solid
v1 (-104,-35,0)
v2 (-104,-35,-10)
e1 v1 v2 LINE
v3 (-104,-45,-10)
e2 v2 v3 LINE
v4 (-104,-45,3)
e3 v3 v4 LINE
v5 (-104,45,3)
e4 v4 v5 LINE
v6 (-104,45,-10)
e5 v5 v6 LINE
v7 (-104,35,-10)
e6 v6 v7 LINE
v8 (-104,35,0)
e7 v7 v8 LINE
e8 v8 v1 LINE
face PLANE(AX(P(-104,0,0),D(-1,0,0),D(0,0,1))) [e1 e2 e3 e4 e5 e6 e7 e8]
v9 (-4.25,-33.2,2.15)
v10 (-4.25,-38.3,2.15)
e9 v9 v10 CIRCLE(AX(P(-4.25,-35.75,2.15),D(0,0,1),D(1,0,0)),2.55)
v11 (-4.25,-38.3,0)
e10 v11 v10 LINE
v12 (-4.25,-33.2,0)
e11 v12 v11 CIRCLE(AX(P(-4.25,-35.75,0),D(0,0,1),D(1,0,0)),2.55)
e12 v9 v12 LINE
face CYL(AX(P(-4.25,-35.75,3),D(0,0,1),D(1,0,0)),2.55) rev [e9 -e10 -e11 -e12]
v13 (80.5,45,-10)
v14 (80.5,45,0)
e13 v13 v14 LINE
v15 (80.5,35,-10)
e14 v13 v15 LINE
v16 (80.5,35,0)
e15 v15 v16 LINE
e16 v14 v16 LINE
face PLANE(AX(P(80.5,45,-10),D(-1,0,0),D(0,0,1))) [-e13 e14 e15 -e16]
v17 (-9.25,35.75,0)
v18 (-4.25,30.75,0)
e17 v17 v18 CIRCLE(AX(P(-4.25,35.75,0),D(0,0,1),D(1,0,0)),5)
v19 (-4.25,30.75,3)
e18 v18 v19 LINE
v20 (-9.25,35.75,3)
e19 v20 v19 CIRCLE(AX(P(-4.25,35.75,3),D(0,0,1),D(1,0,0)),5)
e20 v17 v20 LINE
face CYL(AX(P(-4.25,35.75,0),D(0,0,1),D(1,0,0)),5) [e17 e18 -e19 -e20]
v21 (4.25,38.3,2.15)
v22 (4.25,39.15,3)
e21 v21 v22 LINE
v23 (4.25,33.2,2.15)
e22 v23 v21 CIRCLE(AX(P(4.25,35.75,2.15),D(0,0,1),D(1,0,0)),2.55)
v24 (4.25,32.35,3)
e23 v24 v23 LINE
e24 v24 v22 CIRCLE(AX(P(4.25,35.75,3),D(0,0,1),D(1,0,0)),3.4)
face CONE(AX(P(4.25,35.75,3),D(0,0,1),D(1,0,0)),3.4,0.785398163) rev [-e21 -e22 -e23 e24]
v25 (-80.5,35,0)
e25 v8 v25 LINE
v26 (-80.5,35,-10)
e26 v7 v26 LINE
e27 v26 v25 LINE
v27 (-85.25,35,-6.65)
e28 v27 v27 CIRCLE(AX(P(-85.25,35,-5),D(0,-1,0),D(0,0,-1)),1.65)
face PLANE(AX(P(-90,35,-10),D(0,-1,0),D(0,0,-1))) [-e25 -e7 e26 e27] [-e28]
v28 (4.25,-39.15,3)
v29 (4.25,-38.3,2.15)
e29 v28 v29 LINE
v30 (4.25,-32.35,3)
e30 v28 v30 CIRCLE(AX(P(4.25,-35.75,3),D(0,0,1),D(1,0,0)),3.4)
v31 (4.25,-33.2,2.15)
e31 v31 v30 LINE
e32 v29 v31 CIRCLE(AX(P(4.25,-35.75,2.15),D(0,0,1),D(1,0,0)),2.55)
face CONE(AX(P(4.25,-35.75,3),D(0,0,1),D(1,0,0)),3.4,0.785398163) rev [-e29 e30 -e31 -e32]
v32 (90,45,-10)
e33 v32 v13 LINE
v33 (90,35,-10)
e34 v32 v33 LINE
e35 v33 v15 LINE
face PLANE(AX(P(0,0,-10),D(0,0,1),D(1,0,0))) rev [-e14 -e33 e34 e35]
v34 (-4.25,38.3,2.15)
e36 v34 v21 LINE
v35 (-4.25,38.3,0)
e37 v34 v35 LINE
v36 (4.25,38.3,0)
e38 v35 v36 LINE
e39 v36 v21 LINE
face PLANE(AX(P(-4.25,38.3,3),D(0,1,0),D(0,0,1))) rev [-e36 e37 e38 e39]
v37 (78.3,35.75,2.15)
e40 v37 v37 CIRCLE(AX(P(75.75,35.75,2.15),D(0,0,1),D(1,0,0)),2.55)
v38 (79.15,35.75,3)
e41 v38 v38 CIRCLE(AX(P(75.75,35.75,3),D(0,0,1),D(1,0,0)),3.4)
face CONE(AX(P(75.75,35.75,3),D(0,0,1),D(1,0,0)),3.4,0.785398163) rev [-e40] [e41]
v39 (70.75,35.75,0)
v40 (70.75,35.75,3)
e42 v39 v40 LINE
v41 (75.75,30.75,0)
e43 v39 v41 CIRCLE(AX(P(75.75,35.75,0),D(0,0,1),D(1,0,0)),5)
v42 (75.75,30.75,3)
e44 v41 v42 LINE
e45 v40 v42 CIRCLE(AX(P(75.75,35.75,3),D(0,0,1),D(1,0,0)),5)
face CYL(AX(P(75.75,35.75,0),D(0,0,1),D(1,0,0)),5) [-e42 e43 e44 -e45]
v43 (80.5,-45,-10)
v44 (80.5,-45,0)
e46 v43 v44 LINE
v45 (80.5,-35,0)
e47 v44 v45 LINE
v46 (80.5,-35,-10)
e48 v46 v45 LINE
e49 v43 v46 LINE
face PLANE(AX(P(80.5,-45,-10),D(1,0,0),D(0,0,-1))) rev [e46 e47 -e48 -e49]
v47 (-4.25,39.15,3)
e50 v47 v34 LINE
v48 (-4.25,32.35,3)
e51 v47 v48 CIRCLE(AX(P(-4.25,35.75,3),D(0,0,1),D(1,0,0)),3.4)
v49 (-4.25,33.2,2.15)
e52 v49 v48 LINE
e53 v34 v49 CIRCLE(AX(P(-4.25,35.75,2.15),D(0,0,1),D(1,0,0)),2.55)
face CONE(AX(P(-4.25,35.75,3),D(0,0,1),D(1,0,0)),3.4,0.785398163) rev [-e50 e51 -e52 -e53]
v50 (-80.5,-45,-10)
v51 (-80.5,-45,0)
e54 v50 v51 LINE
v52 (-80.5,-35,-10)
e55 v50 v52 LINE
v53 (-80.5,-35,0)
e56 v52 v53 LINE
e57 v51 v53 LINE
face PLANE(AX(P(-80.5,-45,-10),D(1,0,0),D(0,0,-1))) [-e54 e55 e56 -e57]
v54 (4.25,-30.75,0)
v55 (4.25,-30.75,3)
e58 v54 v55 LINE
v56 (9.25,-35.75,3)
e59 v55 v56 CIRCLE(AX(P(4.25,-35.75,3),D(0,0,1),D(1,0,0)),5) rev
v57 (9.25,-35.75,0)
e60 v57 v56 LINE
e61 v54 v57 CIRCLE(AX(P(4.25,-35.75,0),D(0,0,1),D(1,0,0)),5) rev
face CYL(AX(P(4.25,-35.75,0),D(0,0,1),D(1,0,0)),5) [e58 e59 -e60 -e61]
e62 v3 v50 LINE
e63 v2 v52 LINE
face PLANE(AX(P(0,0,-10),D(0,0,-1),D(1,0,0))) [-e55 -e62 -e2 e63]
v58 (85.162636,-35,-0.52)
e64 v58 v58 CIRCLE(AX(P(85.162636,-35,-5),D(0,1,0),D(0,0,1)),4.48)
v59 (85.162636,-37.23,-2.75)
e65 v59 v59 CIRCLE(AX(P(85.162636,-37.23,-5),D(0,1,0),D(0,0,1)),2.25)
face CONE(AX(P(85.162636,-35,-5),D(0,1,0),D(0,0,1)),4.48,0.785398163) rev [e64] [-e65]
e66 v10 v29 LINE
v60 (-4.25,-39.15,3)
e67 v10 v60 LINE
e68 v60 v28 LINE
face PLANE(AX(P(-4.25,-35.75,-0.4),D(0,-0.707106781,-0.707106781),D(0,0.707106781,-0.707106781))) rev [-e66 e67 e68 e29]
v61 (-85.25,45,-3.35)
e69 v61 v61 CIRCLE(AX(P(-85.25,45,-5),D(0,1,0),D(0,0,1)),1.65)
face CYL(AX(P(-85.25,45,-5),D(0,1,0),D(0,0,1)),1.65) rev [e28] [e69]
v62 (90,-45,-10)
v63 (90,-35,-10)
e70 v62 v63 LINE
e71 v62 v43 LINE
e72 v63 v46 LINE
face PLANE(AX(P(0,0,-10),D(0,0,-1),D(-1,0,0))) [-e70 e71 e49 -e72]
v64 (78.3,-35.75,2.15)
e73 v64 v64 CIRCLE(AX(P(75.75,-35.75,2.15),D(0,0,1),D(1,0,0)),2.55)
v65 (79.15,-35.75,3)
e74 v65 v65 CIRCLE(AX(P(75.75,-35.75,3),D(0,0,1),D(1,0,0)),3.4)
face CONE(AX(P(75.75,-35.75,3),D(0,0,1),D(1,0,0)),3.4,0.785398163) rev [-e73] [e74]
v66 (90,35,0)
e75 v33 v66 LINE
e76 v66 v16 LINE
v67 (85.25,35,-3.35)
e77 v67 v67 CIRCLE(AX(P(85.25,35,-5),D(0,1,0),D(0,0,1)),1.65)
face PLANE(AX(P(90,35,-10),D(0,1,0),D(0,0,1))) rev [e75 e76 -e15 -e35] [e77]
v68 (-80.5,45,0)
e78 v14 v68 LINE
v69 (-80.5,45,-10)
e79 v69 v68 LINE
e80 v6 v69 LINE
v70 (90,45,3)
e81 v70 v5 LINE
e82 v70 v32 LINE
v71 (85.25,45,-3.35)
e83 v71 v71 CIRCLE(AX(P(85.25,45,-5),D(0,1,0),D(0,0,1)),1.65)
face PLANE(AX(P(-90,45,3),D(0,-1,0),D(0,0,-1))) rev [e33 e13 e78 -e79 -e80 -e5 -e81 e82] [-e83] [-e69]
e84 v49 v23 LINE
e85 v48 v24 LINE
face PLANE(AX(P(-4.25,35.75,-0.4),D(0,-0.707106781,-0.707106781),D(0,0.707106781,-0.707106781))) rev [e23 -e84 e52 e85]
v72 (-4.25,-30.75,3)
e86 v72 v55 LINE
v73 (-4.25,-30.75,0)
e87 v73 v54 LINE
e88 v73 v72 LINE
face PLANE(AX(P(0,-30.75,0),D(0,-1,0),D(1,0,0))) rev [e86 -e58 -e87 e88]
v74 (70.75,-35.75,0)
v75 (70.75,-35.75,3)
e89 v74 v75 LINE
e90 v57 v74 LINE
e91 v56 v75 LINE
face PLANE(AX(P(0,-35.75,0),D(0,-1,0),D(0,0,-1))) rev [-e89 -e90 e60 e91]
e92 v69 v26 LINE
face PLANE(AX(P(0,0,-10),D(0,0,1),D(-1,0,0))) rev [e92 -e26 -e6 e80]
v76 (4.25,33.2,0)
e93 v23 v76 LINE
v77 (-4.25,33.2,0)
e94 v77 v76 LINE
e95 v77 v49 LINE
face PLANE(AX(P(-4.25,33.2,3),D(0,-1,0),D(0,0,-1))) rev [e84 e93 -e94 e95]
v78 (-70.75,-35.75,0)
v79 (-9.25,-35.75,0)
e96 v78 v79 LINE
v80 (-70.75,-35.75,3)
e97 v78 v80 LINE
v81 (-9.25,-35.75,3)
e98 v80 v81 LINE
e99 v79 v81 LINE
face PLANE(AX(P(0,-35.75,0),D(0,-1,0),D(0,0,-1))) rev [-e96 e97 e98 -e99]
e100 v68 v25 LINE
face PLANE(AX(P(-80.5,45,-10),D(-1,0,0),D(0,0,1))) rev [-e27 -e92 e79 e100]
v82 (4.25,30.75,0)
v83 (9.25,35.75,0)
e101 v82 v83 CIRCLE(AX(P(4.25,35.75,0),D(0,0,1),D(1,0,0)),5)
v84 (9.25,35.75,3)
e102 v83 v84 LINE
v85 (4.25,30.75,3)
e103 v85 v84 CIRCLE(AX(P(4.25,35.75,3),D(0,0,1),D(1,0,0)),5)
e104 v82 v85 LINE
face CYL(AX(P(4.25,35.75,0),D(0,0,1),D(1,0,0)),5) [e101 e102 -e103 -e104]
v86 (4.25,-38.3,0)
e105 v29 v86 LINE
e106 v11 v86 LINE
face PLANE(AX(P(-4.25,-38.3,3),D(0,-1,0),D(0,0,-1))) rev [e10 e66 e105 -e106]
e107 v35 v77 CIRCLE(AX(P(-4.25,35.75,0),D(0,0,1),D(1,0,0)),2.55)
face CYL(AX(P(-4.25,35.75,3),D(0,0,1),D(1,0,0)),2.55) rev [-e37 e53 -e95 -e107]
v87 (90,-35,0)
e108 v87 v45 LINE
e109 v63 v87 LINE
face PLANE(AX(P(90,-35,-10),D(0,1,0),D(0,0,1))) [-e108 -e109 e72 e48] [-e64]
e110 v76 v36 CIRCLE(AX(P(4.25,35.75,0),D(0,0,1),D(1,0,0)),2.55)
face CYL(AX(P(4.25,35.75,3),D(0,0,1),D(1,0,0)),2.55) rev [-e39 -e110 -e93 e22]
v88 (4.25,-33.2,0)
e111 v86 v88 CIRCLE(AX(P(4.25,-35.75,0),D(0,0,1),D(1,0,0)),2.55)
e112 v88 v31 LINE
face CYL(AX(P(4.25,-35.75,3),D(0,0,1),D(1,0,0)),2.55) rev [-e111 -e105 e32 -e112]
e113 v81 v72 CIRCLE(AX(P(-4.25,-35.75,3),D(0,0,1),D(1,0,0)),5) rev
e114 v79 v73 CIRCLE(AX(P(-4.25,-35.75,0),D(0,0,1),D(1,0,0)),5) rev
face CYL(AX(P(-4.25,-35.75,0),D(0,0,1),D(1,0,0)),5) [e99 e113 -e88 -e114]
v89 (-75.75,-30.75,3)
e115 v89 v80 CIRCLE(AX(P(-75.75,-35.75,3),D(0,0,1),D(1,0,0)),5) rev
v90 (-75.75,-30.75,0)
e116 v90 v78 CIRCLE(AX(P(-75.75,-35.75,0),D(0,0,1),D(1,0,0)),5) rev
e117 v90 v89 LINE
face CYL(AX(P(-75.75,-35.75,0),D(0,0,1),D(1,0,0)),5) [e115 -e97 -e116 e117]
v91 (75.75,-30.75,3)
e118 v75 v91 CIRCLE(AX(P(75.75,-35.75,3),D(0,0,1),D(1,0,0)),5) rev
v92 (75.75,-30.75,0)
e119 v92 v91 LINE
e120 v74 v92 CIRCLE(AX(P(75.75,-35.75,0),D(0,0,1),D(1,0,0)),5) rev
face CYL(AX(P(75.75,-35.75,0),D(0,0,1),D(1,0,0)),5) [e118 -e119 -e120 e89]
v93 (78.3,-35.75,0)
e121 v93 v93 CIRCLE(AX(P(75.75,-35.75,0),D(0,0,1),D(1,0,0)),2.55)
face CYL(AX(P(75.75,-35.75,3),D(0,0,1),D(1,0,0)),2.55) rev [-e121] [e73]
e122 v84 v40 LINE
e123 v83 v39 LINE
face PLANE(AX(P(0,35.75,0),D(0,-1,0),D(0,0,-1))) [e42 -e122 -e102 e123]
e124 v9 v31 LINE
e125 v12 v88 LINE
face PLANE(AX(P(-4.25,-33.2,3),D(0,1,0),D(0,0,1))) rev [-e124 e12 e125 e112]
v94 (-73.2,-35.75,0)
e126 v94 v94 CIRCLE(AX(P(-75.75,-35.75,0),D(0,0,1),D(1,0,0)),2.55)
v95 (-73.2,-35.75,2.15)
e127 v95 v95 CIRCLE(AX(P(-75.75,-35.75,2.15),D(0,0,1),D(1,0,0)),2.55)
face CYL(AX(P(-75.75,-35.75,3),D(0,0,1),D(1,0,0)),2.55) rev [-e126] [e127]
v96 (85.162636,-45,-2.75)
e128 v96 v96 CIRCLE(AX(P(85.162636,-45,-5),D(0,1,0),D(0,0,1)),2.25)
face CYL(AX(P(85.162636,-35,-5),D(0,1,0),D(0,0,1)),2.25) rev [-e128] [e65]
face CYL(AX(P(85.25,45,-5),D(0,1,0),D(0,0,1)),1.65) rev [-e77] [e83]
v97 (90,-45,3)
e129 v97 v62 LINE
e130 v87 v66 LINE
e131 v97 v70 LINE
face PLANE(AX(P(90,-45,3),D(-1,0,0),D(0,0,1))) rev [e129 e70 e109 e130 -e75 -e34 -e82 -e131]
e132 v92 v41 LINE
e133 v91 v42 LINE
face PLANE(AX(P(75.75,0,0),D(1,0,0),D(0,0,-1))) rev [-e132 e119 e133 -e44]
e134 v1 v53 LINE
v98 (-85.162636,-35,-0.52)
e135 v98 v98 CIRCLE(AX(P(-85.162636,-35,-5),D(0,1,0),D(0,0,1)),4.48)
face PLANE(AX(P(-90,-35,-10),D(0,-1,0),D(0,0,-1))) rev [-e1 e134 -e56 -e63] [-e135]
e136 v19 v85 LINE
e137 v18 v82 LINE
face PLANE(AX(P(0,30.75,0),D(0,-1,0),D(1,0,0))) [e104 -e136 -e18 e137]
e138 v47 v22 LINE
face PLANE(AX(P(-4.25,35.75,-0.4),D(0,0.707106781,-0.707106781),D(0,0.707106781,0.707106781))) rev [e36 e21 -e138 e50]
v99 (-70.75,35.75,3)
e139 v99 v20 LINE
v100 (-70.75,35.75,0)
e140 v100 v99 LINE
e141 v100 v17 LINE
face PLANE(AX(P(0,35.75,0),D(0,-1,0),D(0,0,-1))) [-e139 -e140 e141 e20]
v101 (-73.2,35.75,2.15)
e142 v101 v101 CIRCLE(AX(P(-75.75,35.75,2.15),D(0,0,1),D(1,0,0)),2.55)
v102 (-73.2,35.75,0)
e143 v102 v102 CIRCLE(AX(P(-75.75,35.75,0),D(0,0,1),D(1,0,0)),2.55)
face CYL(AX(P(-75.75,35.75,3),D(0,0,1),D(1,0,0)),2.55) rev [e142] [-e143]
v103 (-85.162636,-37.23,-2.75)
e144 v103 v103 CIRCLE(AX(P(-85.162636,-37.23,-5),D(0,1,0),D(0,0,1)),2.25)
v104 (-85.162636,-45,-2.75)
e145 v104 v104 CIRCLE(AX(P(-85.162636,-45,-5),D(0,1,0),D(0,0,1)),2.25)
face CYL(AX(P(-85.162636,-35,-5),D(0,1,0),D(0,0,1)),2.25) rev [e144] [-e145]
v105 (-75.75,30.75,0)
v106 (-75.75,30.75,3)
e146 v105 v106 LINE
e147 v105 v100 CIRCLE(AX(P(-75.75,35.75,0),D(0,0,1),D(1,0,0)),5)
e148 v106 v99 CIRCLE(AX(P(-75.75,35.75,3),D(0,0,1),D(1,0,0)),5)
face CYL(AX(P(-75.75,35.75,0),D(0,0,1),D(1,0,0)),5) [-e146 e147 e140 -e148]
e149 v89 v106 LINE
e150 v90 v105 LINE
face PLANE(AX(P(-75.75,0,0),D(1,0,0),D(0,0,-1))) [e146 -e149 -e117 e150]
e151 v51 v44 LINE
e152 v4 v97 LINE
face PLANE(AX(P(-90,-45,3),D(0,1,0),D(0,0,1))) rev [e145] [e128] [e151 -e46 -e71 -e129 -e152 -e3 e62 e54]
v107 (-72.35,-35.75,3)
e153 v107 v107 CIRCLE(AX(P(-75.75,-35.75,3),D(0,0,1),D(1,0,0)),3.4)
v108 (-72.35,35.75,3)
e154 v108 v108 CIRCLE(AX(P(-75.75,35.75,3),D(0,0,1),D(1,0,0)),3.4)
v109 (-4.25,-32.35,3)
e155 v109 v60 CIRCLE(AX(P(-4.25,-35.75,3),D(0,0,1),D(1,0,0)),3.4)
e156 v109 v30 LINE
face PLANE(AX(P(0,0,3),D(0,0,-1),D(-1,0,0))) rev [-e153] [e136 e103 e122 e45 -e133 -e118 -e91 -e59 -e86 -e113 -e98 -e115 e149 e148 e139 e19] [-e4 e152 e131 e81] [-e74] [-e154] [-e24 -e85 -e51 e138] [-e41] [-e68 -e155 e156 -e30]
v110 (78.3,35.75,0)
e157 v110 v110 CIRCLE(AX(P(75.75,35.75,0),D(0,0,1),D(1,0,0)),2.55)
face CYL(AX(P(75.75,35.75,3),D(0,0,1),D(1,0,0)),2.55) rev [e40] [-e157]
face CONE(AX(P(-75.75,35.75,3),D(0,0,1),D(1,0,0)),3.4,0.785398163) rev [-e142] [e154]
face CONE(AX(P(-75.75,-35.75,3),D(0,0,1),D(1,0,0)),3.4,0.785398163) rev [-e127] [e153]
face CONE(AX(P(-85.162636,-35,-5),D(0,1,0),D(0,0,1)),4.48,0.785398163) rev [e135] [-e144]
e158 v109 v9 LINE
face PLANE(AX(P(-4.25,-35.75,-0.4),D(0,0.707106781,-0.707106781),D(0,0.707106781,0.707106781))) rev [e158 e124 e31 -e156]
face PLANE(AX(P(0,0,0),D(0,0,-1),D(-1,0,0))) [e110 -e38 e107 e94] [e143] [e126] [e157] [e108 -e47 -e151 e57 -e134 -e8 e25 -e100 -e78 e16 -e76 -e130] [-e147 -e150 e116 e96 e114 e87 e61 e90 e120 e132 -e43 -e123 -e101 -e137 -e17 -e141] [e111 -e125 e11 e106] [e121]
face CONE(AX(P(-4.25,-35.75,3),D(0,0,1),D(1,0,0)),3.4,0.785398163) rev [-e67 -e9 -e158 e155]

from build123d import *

# Parameters (mm, degrees)
SKETCH3_W                                      = 180
SKETCH3_H                                      = 90
BOSS_EXTRUDE3_DEPTH                            = 3
SKETCH4_W                                      = 8.5
SKETCH4_H                                      = 61.5
CUT_EXTRUDE1_DEPTH                             = 3
CSK_FOR_M5_FLAT_HEAD_MACHINE_SCREW1_AT_2_COUNT = 2
CSK_FOR_M5_FLAT_HEAD_MACHINE_SCREW1_AT_2_PITCH = 167.524625056
CSK_FOR_M5_FLAT_HEAD_MACHINE_SCREW1_AT_3_COUNT = 2
CSK_FOR_M5_FLAT_HEAD_MACHINE_SCREW1_AT_3_PITCH = 71.5
CSK_FOR_M5_FLAT_HEAD_MACHINE_SCREW1_AT_4_COUNT = 2
CSK_FOR_M5_FLAT_HEAD_MACHINE_SCREW1_AT_4_PITCH = 151.5
CSK_SLOT_FOR_M5_FLAT_HEAD_MACHINE_SCREW1_DEPTH = 3
SKETCH12_W                                     = 9.5
SKETCH12_H                                     = 10
BOSS_EXTRUDE4_DEPTH                            = 10
CSK_FOR_M4_SFHCS1_D                            = 4.5
CSK_FOR_M4_SFHCS1_DEPTH                        = 10
CSK_FOR_M4_SFHCS1_CSINK_D                      = 8.96
CSK_FOR_M4_SFHCS1_CSINK_ANGLE                  = 90
M4X0_7_TAPPED_HOLE1_D                          = 3.3
BOSS_EXTRUDE5_DEPTH                            = 14


with BuildPart() as part:
    # Sketch3 → Boss-Extrude3 (new body)
    with BuildSketch(Plane.XY):
        Rectangle(SKETCH3_W, SKETCH3_H)
    extrude(amount=BOSS_EXTRUDE3_DEPTH)

    # Sketch4 → Cut-Extrude1 (cut)
    with BuildSketch(Plane.XY.offset(3)):
        with BuildLine():
            Line((-4.25, -30.75), (-4.25, 30.75))
            ThreePointArc((-4.25, 30.75), (-7.785533906, 32.214466094), (-9.25, 35.75))
            Line((-9.25, 35.75), (-70.75, 35.75))
            ThreePointArc((-70.75, 35.75), (-72.214466094, 32.214466094), (-75.75, 30.75))
            Line((-75.75, 30.75), (-75.75, -30.75))
            ThreePointArc((-75.75, -30.75), (-72.214466094, -32.214466094), (-70.75, -35.75))
            Line((-70.75, -35.75), (-9.25, -35.75))
            ThreePointArc((-9.25, -35.75), (-7.785533906, -32.214466094), (-4.25, -30.75))
        make_face()
        Rectangle(SKETCH4_W, SKETCH4_H)
        with BuildLine():
            ThreePointArc((9.25, 35.75), (7.785533906, 32.214466094), (4.25, 30.75))
            Line((4.25, 30.75), (4.25, -30.75))
            ThreePointArc((4.25, -30.75), (7.785533906, -32.214466094), (9.25, -35.75))
            Line((9.25, -35.75), (70.75, -35.75))
            ThreePointArc((70.75, -35.75), (72.214466094, -32.214466094), (75.75, -30.75))
            Line((75.75, -30.75), (75.75, 30.75))
            ThreePointArc((75.75, 30.75), (72.214466094, 32.214466094), (70.75, 35.75))
            Line((70.75, 35.75), (9.25, 35.75))
        make_face()
    extrude(amount=-CUT_EXTRUDE1_DEPTH, mode=Mode.SUBTRACT)

    # Sketch8 → CSK for M5 Flat Head Machine Screw1 (revolve, cut)
    with BuildSketch(Plane(origin=(-75.75, 35.75, 3), x_dir=(0, -1, 0), z_dir=(1, 0, 0))):
        Polygon((0, 0), (0, 3), (2.55, 3), (2.55, 0.85), (3.4, 0), align=None)
    csk_for_m5_flat_head_machine_screw1 = revolve(axis=Axis((-75.75, 35.75, 9.35), (0, 0, -1)), mode=Mode.SUBTRACT)

    # CSK for M5 Flat Head Machine Screw1 at 2: CSK for M5 Flat Head Machine Screw1 ×2
    with Locations(*[Vector(0.9043446594777974, -0.4268029251000826, 0) * (i * CSK_FOR_M5_FLAT_HEAD_MACHINE_SCREW1_AT_2_PITCH) for i in range(1, CSK_FOR_M5_FLAT_HEAD_MACHINE_SCREW1_AT_2_COUNT)]):
        add(csk_for_m5_flat_head_machine_screw1, mode=Mode.SUBTRACT)

    # CSK for M5 Flat Head Machine Screw1 at 3: CSK for M5 Flat Head Machine Screw1 ×2
    with Locations(*[(0, -i * CSK_FOR_M5_FLAT_HEAD_MACHINE_SCREW1_AT_3_PITCH, 0) for i in range(1, CSK_FOR_M5_FLAT_HEAD_MACHINE_SCREW1_AT_3_COUNT)]):
        add(csk_for_m5_flat_head_machine_screw1, mode=Mode.SUBTRACT)

    # CSK for M5 Flat Head Machine Screw1 at 4: CSK for M5 Flat Head Machine Screw1 ×2
    with Locations(*[(i * CSK_FOR_M5_FLAT_HEAD_MACHINE_SCREW1_AT_4_PITCH, 0, 0) for i in range(1, CSK_FOR_M5_FLAT_HEAD_MACHINE_SCREW1_AT_4_COUNT)]):
        add(csk_for_m5_flat_head_machine_screw1, mode=Mode.SUBTRACT)

    # CSK SLOT for M5 Flat Head Machine Screw1: read off the stored shape, not the designer's step
    # CSK SLOT for M5 Flat Head Machine Sc 2 → CSK SLOT for M5 Flat Head Machine Screw1 (cut)
    with BuildSketch(Plane.XY):
        with BuildLine():
            Line((-4.25, 33.2), (4.25, 33.2))
            ThreePointArc((4.25, 33.2), (6.8, 35.75), (4.25, 38.3))
            Line((4.25, 38.3), (-4.25, 38.3))
            ThreePointArc((-4.25, 38.3), (-6.8, 35.75), (-4.25, 33.2))
        make_face()
        with BuildLine():
            Line((-4.25, -38.3), (4.25, -38.3))
            ThreePointArc((4.25, -38.3), (6.8, -35.75), (4.25, -33.2))
            Line((4.25, -33.2), (-4.25, -33.2))
            ThreePointArc((-4.25, -33.2), (-6.8, -35.75), (-4.25, -38.3))
        make_face()
    extrude(amount=CSK_SLOT_FOR_M5_FLAT_HEAD_MACHINE_SCREW1_DEPTH, mode=Mode.SUBTRACT)

    # CSK SLOT for M5 Flat Head Machine Sc 3: loft between two sections, ruled curve by curve
    csk_slot_for_m5_flat_head_machine_sc_3_from = [
        Edge.make_three_point_arc((4.25, 33.2, 2.15), (6.053122292, 33.946877708, 2.15), (6.8, 35.75, 2.15)),
        Edge.make_three_point_arc((6.8, 35.75, 2.15), (6.053122292, 37.553122292, 2.15), (4.25, 38.3, 2.15)),
        Edge.make_three_point_arc((-4.25, 38.3, 2.15), (-6.053122292, 37.553122292, 2.15), (-6.8, 35.75, 2.15)),
        Edge.make_three_point_arc((-6.8, 35.75, 2.15), (-6.053122292, 33.946877708, 2.15), (-4.25, 33.2, 2.15)),
        Edge.make_line((4.25, 38.3, 2.15), (-4.25, 38.3, 2.15)),
        Edge.make_line((4.25, 33.2, 2.15), (-4.25, 33.2, 2.15)),
    ]
    csk_slot_for_m5_flat_head_machine_sc_3_to = [
        Edge.make_three_point_arc((4.25, 32.35, 3), (6.654163056, 33.345836944, 3), (7.65, 35.75, 3)),
        Edge.make_three_point_arc((7.65, 35.75, 3), (6.654163056, 38.154163056, 3), (4.25, 39.15, 3)),
        Edge.make_three_point_arc((-4.25, 39.15, 3), (-6.654163056, 38.154163056, 3), (-7.65, 35.75, 3)),
        Edge.make_three_point_arc((-7.65, 35.75, 3), (-6.654163056, 33.345836944, 3), (-4.25, 32.35, 3)),
        Edge.make_line((4.25, 39.15, 3), (-4.25, 39.15, 3)),
        Edge.make_line((4.25, 32.35, 3), (-4.25, 32.35, 3)),
    ]
    csk_slot_for_m5_flat_head_machine_sc_3 = Solid(Shell([*[Face.make_surface_from_curves(csk_slot_for_m5_flat_head_machine_sc_3_from[k], csk_slot_for_m5_flat_head_machine_sc_3_to[k]) for k in range(6)], Face(Wire(csk_slot_for_m5_flat_head_machine_sc_3_from)), Face(Wire(csk_slot_for_m5_flat_head_machine_sc_3_to))]))
    add(csk_slot_for_m5_flat_head_machine_sc_3, mode=Mode.SUBTRACT)

    # CSK SLOT for M5 Flat Head Machine Sc 4: loft between two sections, ruled curve by curve
    csk_slot_for_m5_flat_head_machine_sc_4_from = [
        Edge.make_three_point_arc((4.25, -38.3, 2.15), (6.053122292, -37.553122292, 2.15), (6.8, -35.75, 2.15)),
        Edge.make_three_point_arc((6.8, -35.75, 2.15), (6.053122292, -33.946877708, 2.15), (4.25, -33.2, 2.15)),
        Edge.make_three_point_arc((-4.25, -33.2, 2.15), (-6.053122292, -33.946877708, 2.15), (-6.8, -35.75, 2.15)),
        Edge.make_three_point_arc((-6.8, -35.75, 2.15), (-6.053122292, -37.553122292, 2.15), (-4.25, -38.3, 2.15)),
        Edge.make_line((4.25, -33.2, 2.15), (-4.25, -33.2, 2.15)),
        Edge.make_line((4.25, -38.3, 2.15), (-4.25, -38.3, 2.15)),
    ]
    csk_slot_for_m5_flat_head_machine_sc_4_to = [
        Edge.make_three_point_arc((4.25, -39.15, 3), (6.654163056, -38.154163056, 3), (7.65, -35.75, 3)),
        Edge.make_three_point_arc((7.65, -35.75, 3), (6.654163056, -33.345836944, 3), (4.25, -32.35, 3)),
        Edge.make_three_point_arc((-4.25, -32.35, 3), (-6.654163056, -33.345836944, 3), (-7.65, -35.75, 3)),
        Edge.make_three_point_arc((-7.65, -35.75, 3), (-6.654163056, -38.154163056, 3), (-4.25, -39.15, 3)),
        Edge.make_line((4.25, -32.35, 3), (-4.25, -32.35, 3)),
        Edge.make_line((4.25, -39.15, 3), (-4.25, -39.15, 3)),
    ]
    csk_slot_for_m5_flat_head_machine_sc_4 = Solid(Shell([*[Face.make_surface_from_curves(csk_slot_for_m5_flat_head_machine_sc_4_from[k], csk_slot_for_m5_flat_head_machine_sc_4_to[k]) for k in range(6)], Face(Wire(csk_slot_for_m5_flat_head_machine_sc_4_from)), Face(Wire(csk_slot_for_m5_flat_head_machine_sc_4_to))]))
    add(csk_slot_for_m5_flat_head_machine_sc_4, mode=Mode.SUBTRACT)

    # Sketch12 → Boss-Extrude4 (add)
    with BuildSketch(Plane(origin=(0, 0, 0), x_dir=(-1, 0, 0), z_dir=(0, 0, -1))):
        with Locations((-85.25, 40)):
            Rectangle(SKETCH12_W, SKETCH12_H)
        with Locations((-85.25, -40)):
            Rectangle(SKETCH12_W, SKETCH12_H)
    boss_extrude4 = extrude(amount=BOSS_EXTRUDE4_DEPTH)

    # CSK for M4 SFHCS1
    with Locations(Plane(origin=(0, -35, 0), x_dir=(1, 0, 0), z_dir=(0, 1, 0))):
        with Locations((85.162636167, 5)):
            csk_for_m4_sfhcs1 = CounterSinkHole(CSK_FOR_M4_SFHCS1_D / 2, CSK_FOR_M4_SFHCS1_CSINK_D / 2, depth=CSK_FOR_M4_SFHCS1_DEPTH, counter_sink_angle=CSK_FOR_M4_SFHCS1_CSINK_ANGLE)

    # M4x0.7 Tapped Hole1 (through all)
    with Locations(Plane(origin=(0, 45, 0), x_dir=(1, 0, 0), z_dir=(0, 1, 0))):
        with Locations((85.25, 5)):
            m4x0_7_tapped_hole1 = Hole(M4X0_7_TAPPED_HOLE1_D / 2)

    # Mirror1: Boss-Extrude4, CSK for M4 SFHCS1, M4x0.7 Tapped Hole1 across plane
    add(boss_extrude4.mirror(Plane(origin=(0, 0, 0), x_dir=(0, 0, 1), z_dir=(1, 0, 0))))
    add(csk_for_m4_sfhcs1.mirror(Plane(origin=(0, 0, 0), x_dir=(0, 0, 1), z_dir=(1, 0, 0))), mode=Mode.SUBTRACT)
    add(m4x0_7_tapped_hole1.mirror(Plane(origin=(0, 0, 0), x_dir=(0, 0, 1), z_dir=(1, 0, 0))), mode=Mode.SUBTRACT)

    # Sketch20 → Boss-Extrude5 (add)
    with BuildSketch(Plane.ZY.offset(90)):
        Polygon((3, -45), (3, 45), (-10, 45), (-10, 35), (0, 35), (0, -35), (-10, -35), (-10, -45), align=None)
    extrude(amount=BOSS_EXTRUDE5_DEPTH)


solid = part.part
